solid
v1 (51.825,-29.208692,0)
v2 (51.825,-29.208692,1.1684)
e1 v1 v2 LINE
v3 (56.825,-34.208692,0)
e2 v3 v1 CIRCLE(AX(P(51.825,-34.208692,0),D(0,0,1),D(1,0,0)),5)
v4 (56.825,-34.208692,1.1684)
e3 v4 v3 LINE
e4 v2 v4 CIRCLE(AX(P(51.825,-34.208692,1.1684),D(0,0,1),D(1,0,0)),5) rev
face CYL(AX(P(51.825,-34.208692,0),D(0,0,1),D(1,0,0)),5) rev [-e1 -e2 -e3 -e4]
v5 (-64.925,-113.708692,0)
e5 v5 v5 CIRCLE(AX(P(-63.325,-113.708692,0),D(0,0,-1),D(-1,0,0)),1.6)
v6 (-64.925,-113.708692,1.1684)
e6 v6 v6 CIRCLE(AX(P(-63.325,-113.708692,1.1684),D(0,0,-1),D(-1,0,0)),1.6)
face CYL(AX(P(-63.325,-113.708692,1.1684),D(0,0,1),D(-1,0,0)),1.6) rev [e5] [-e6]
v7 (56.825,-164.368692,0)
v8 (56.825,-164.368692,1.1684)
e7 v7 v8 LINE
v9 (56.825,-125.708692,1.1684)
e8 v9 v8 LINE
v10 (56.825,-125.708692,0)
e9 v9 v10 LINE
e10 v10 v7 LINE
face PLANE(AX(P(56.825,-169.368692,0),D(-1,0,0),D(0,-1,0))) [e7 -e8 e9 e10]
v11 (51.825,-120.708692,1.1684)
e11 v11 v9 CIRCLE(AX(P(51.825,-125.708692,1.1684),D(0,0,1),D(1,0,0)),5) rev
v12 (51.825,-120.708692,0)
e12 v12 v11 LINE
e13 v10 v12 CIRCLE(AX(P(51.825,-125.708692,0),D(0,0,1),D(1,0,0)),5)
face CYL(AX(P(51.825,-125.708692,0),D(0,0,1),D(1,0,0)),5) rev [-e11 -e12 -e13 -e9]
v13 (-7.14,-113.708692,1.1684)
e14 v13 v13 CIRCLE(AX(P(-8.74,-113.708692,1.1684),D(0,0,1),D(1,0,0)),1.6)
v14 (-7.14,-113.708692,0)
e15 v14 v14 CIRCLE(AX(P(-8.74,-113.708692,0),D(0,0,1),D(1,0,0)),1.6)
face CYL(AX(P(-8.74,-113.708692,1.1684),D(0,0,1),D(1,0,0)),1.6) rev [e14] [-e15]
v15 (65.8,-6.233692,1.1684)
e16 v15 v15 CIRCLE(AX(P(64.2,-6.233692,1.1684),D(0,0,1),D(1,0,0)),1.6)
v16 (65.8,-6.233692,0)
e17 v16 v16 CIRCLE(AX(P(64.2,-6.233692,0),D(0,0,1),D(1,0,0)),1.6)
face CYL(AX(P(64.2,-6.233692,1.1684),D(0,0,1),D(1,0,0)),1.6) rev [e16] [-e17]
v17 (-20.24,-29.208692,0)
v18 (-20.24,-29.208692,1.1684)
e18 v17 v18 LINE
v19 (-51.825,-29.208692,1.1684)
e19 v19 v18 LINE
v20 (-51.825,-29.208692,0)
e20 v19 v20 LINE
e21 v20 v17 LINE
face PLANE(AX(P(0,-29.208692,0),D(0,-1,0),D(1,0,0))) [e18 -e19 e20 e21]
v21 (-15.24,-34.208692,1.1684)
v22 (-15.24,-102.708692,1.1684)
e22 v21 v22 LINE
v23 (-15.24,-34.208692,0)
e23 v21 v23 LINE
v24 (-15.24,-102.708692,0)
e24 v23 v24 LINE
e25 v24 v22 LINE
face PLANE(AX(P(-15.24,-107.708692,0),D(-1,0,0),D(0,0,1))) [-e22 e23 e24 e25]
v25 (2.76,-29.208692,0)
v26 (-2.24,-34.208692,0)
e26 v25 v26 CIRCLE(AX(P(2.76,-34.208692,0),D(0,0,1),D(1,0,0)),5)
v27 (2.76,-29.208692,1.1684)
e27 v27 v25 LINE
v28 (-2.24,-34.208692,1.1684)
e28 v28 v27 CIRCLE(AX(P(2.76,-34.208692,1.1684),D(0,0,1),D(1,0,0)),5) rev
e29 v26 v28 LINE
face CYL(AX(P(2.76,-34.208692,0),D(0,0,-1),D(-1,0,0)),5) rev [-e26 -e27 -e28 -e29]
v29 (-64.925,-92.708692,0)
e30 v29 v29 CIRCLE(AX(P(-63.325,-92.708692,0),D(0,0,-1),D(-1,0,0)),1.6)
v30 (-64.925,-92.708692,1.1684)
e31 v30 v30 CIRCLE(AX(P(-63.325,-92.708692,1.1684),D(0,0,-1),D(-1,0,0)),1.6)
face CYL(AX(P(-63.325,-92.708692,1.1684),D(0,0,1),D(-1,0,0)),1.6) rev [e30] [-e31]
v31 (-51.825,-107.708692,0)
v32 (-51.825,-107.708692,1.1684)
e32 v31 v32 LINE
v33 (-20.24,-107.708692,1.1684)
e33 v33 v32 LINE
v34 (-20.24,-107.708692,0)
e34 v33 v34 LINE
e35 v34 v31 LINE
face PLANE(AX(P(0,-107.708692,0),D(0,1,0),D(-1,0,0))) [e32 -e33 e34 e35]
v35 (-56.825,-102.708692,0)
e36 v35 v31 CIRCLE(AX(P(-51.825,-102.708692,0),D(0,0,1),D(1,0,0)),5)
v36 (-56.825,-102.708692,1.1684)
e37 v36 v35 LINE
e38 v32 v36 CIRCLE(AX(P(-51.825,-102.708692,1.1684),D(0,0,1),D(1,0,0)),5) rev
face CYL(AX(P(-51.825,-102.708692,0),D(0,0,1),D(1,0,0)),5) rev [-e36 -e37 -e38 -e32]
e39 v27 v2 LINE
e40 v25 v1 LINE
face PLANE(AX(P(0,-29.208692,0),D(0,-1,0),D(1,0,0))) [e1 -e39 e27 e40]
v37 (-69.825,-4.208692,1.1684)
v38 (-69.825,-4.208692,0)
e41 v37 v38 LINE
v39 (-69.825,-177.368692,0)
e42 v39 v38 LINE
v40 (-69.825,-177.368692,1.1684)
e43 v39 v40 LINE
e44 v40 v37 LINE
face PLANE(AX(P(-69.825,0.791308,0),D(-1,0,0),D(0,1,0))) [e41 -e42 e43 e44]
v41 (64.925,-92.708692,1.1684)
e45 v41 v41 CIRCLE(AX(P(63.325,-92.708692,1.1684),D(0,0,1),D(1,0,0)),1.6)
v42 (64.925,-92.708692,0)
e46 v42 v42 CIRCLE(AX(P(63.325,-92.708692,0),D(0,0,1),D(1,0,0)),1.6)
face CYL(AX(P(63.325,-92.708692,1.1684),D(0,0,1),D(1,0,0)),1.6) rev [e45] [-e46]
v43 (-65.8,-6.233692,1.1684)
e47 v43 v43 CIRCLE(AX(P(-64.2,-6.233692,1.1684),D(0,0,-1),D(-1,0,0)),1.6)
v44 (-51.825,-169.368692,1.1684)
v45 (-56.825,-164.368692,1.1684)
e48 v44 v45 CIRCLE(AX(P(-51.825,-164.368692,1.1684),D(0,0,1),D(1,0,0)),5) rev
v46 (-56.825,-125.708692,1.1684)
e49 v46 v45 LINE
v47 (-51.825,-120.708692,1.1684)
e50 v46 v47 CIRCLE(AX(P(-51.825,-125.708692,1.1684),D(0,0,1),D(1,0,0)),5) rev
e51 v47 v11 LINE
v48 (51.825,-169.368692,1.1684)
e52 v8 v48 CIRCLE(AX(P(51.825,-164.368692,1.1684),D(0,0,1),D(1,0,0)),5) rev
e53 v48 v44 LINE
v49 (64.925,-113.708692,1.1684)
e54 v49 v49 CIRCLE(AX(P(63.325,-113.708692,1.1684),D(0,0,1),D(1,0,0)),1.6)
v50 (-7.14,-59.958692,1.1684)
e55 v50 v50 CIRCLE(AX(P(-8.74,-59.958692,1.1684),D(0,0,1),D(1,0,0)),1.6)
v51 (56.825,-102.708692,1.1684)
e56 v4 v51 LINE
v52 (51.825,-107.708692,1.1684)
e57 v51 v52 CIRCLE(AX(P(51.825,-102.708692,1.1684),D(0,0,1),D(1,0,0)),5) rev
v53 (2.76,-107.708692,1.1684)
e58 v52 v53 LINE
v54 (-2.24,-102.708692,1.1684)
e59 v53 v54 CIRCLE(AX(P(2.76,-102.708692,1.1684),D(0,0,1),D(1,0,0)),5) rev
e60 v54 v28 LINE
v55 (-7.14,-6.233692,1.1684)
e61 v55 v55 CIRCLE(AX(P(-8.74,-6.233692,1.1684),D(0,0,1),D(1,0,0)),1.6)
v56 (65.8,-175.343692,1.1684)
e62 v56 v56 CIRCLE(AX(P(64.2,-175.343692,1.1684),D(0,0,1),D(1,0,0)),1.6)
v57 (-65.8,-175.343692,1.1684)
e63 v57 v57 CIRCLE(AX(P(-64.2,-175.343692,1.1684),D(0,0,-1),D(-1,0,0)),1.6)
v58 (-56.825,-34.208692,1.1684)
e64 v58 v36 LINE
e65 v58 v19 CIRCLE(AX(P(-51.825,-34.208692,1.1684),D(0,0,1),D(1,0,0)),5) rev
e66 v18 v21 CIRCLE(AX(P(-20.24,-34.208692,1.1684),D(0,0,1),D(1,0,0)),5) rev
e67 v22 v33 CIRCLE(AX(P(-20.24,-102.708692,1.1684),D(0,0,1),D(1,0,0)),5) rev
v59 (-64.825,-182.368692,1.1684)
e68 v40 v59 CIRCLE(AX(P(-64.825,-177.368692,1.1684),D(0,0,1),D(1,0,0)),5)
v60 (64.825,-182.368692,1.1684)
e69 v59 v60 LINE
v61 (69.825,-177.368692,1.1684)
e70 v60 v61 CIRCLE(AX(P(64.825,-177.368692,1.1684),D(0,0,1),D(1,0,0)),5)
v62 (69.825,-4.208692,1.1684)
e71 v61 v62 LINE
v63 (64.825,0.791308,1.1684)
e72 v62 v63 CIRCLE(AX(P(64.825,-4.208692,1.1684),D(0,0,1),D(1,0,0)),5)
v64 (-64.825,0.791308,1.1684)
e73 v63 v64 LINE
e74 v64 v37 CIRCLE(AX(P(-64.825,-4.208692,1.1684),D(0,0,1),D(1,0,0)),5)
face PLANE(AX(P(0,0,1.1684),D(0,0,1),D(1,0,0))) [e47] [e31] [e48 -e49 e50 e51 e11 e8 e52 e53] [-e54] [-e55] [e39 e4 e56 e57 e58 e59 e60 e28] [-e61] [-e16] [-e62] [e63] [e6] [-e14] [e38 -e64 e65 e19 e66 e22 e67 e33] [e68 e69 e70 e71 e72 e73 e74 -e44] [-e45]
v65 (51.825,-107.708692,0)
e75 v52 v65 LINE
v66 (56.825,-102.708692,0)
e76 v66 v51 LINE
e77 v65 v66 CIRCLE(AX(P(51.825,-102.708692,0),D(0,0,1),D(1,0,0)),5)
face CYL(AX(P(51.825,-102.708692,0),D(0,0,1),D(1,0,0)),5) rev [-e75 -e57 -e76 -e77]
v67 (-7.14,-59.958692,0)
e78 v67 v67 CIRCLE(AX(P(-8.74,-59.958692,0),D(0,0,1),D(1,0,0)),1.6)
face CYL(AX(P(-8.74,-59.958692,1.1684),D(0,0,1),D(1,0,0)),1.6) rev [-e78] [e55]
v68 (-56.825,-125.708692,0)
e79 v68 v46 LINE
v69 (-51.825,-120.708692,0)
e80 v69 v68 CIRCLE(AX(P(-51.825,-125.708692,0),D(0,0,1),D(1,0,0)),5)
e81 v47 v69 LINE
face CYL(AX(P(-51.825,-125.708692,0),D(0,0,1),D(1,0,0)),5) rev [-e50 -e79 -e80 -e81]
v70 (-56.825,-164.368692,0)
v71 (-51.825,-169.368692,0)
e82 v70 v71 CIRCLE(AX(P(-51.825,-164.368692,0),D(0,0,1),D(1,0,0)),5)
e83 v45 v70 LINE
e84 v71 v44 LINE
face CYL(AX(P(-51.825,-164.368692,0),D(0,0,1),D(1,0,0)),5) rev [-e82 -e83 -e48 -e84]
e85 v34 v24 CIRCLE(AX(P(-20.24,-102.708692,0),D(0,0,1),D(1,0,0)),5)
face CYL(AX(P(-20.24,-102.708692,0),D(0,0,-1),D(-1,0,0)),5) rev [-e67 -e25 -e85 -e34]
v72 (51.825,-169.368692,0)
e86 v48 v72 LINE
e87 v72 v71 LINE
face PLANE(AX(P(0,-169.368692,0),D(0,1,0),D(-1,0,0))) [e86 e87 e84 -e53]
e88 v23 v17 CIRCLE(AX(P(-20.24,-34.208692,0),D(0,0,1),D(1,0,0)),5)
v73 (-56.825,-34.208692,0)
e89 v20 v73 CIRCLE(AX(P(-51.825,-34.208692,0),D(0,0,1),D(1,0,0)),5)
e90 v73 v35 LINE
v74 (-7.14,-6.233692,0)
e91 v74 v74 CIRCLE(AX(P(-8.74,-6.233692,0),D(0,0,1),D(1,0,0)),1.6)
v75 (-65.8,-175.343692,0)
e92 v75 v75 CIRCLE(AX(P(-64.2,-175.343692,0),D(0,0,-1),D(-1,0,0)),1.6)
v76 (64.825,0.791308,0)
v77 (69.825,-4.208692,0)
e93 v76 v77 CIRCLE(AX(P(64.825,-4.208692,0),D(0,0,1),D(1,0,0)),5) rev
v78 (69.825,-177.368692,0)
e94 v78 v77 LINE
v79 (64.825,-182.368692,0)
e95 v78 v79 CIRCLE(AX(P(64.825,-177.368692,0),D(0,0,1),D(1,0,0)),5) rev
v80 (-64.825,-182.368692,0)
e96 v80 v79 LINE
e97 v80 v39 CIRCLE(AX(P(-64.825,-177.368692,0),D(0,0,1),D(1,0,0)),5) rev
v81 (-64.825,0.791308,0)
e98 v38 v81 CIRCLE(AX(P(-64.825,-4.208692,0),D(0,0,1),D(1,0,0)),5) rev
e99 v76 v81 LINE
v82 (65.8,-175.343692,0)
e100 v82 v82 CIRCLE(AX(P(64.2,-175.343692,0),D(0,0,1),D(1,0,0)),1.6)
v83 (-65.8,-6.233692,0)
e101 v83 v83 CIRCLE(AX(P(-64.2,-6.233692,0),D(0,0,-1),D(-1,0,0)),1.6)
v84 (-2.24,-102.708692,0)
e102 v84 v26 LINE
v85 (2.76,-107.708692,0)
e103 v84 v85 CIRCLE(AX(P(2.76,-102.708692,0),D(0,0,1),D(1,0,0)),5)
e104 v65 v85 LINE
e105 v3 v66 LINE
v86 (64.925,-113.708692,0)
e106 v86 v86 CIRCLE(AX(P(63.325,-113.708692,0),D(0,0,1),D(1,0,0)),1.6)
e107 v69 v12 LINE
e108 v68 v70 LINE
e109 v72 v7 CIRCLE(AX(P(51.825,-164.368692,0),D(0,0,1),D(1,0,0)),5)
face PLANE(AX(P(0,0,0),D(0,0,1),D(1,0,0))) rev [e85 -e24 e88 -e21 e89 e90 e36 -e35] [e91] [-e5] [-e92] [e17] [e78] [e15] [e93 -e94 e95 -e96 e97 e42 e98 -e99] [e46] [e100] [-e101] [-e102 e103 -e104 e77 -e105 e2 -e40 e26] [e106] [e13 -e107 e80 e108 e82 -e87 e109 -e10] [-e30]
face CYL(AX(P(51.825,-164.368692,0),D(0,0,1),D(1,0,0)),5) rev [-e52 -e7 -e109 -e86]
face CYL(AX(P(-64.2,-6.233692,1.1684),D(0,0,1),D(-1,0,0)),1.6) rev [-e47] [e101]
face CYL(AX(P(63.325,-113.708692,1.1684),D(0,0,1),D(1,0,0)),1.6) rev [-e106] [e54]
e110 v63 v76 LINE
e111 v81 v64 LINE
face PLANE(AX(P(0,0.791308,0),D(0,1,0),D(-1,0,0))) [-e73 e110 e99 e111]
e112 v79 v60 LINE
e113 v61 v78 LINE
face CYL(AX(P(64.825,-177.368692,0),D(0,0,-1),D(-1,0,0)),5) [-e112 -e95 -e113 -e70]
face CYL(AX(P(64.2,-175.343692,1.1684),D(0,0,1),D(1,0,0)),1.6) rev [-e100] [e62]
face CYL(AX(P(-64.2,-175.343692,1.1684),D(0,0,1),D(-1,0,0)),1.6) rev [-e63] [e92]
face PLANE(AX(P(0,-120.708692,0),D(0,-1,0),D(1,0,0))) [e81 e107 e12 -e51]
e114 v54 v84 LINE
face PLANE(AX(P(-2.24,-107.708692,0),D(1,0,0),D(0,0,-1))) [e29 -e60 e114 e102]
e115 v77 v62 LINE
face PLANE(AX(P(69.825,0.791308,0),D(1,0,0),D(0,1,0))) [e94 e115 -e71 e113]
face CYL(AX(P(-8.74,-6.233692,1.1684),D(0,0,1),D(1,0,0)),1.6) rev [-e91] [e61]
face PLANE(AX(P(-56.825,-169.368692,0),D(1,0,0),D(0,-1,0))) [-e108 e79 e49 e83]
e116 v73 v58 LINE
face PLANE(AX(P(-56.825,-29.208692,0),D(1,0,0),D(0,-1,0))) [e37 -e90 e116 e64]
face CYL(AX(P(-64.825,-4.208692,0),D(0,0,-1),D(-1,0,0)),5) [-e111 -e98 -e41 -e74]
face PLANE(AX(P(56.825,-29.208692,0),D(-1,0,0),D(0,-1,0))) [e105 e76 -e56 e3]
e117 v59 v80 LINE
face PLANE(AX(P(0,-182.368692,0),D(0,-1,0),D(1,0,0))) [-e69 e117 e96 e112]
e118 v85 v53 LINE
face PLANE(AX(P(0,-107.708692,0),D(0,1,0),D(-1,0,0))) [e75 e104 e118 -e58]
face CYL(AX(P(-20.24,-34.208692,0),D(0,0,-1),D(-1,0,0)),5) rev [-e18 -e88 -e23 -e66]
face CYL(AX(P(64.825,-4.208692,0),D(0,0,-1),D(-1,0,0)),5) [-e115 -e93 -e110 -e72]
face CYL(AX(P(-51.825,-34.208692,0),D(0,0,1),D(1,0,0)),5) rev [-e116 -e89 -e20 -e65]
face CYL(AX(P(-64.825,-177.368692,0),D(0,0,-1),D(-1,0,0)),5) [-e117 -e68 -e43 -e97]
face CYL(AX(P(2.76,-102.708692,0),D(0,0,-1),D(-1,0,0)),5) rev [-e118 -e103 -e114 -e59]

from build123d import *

# Parameters (mm, degrees)
SKETCH1_W                = 69.825
SKETCH1_H                = 183.16
FRONT_PLATE_DEPTH        = 1.2
CUT_EXTRUDE1_REACH       = 197.283
SKETCH3_W                = 56.825
SKETCH3_H                = 78.5
SKETCH3_H_2              = 48.66
CONVERT_SOLID5_START     = 1.1684
CONVERT_SOLID5_DEPTH     = 0.0316
M3_CLEARANCE_HOLE1_D     = 3.2
M3_CLEARANCE_HOLE1_DEPTH = 5
M3_CLEARANCE_HOLE1_TIP   = 0.96137699
SKETCH62_W               = 13
SKETCH62_H               = 78.5
BOSS_EXTRUDE2_DEPTH      = 1.1684
FILLET1_R                = 5
M3_CLEARANCE_HOLE2_D     = 3.2
M3_CLEARANCE_HOLE2_DEPTH = 5
M3_CLEARANCE_HOLE2_TIP   = 0.96137699


# Read off the part's stored shape, not the designer's step: Convert-Solid5
with BuildPart() as part:
    # Sketch1 → front_plate (new body)
    with BuildSketch(Plane.XY):
        with Locations((34.9125, -90.788691865)):
            Rectangle(SKETCH1_W, SKETCH1_H)
    extrude(amount=FRONT_PLATE_DEPTH)

    # Sketch3 → Cut-Extrude1 (cut, up to next)
    with BuildSketch(Plane.XY.offset(1.2), mode=Mode.PRIVATE) as cut_extrude1_sk1:
        with Locations((28.4125, -68.458691865)):
            Rectangle(SKETCH3_W, SKETCH3_H)
    cut_extrude1_tool1 = extrude(cut_extrude1_sk1.sketch, amount=-CUT_EXTRUDE1_REACH, mode=Mode.PRIVATE) & part.part
    # Sketch3 → Cut-Extrude1 (cut, up to next)
    with BuildSketch(Plane.XY.offset(1.2), mode=Mode.PRIVATE) as cut_extrude1_sk2:
        with Locations((28.4125, -145.038691865)):
            Rectangle(SKETCH3_W, SKETCH3_H_2)
    cut_extrude1_tool2 = extrude(cut_extrude1_sk2.sketch, amount=-CUT_EXTRUDE1_REACH, mode=Mode.PRIVATE) & part.part
    add(cut_extrude1_tool1.solids().sort_by_distance((28.4125, -68.458692, 1.2))[0], mode=Mode.SUBTRACT)
    add(cut_extrude1_tool2.solids().sort_by_distance((28.4125, -145.038692, 1.2))[0], mode=Mode.SUBTRACT)

    # Convert-Solid5 outline → Convert-Solid5 (cut)
    with BuildSketch(Plane.XY.offset(CONVERT_SOLID5_START)):
        Polygon((56.825, -107.708691865), (0, -107.708691865), (0, -120.708691865), (56.825, -120.708691865), (56.825, -169.368691865), (0, -169.368691865), (0, -182.368691865), (69.825, -182.368691865), (69.825, 0.791308135), (0, 0.791308135), (0, -29.208691865), (56.825, -29.208691865), align=None)
    extrude(amount=CONVERT_SOLID5_DEPTH, mode=Mode.SUBTRACT)

    # M3 Clearance Hole1
    with Locations(Plane.XY.offset(1.1684)):
        with Locations((63.325, -92.708691865), (63.325, -113.708691865), (64.2, -6.233691865), (64.2, -175.343691865)):
            Hole(M3_CLEARANCE_HOLE1_D / 2, depth=M3_CLEARANCE_HOLE1_DEPTH)
            with Locations((0, 0, -(M3_CLEARANCE_HOLE1_DEPTH + M3_CLEARANCE_HOLE1_TIP / 2))):  # 118° drill point
                Cone(0, M3_CLEARANCE_HOLE1_D / 2, M3_CLEARANCE_HOLE1_TIP, mode=Mode.SUBTRACT)

    # Mirror2: part across plane


with BuildPart() as part_1:
    add(part.part)
    add(part.part.mirror(Plane(origin=(0, 0.791308135, 0), x_dir=(0, 0, 1), z_dir=(-1, 0, 0))))

    # Sketch62 → Boss-Extrude2 (add)
    with BuildSketch(Plane.XY.offset(1.1684)):
        with Locations((-8.74, -68.458691865)):
            Rectangle(SKETCH62_W, SKETCH62_H)
    extrude(amount=-BOSS_EXTRUDE2_DEPTH)

    # Fillet1
    fillet1_edges = [part_1.edges().sort_by_distance(p)[0] for p in [
        (-15.24, -107.708691865, 0.5842),
        (-15.24, -29.208691865, 0.5842),
        (-2.24, -29.208691865, 0.5842),
        (-2.24, -107.708691865, 0.5842),
        (56.825, -120.708691865, 0.5842),
        (56.825, -169.368691865, 0.5842),
        (69.825, -182.368691865, 0.5842),
        (69.825, 0.791308135, 0.5842),
        (56.825, -29.208691865, 0.5842),
        (56.825, -107.708691865, 0.5842),
        (-56.825, -107.708691865, 0.5842),
        (-56.825, -29.208691865, 0.5842),
        (-69.825, 0.791308135, 0.5842),
        (-69.825, -182.368691865, 0.5842),
        (-56.825, -169.368691865, 0.5842),
        (-56.825, -120.708691865, 0.5842),
    ]]
    fillet(fillet1_edges, radius=FILLET1_R)

    # M3 Clearance Hole2
    with Locations(Plane.XY.offset(1.1684)):
        with Locations((-8.74, -6.233691865), (-8.74, -59.958691865), (-8.74, -113.708691865)):
            Hole(M3_CLEARANCE_HOLE2_D / 2, depth=M3_CLEARANCE_HOLE2_DEPTH)
            with Locations((0, 0, -(M3_CLEARANCE_HOLE2_DEPTH + M3_CLEARANCE_HOLE2_TIP / 2))):  # 118° drill point
                Cone(0, M3_CLEARANCE_HOLE2_D / 2, M3_CLEARANCE_HOLE2_TIP, mode=Mode.SUBTRACT)


solid = part_1.part
